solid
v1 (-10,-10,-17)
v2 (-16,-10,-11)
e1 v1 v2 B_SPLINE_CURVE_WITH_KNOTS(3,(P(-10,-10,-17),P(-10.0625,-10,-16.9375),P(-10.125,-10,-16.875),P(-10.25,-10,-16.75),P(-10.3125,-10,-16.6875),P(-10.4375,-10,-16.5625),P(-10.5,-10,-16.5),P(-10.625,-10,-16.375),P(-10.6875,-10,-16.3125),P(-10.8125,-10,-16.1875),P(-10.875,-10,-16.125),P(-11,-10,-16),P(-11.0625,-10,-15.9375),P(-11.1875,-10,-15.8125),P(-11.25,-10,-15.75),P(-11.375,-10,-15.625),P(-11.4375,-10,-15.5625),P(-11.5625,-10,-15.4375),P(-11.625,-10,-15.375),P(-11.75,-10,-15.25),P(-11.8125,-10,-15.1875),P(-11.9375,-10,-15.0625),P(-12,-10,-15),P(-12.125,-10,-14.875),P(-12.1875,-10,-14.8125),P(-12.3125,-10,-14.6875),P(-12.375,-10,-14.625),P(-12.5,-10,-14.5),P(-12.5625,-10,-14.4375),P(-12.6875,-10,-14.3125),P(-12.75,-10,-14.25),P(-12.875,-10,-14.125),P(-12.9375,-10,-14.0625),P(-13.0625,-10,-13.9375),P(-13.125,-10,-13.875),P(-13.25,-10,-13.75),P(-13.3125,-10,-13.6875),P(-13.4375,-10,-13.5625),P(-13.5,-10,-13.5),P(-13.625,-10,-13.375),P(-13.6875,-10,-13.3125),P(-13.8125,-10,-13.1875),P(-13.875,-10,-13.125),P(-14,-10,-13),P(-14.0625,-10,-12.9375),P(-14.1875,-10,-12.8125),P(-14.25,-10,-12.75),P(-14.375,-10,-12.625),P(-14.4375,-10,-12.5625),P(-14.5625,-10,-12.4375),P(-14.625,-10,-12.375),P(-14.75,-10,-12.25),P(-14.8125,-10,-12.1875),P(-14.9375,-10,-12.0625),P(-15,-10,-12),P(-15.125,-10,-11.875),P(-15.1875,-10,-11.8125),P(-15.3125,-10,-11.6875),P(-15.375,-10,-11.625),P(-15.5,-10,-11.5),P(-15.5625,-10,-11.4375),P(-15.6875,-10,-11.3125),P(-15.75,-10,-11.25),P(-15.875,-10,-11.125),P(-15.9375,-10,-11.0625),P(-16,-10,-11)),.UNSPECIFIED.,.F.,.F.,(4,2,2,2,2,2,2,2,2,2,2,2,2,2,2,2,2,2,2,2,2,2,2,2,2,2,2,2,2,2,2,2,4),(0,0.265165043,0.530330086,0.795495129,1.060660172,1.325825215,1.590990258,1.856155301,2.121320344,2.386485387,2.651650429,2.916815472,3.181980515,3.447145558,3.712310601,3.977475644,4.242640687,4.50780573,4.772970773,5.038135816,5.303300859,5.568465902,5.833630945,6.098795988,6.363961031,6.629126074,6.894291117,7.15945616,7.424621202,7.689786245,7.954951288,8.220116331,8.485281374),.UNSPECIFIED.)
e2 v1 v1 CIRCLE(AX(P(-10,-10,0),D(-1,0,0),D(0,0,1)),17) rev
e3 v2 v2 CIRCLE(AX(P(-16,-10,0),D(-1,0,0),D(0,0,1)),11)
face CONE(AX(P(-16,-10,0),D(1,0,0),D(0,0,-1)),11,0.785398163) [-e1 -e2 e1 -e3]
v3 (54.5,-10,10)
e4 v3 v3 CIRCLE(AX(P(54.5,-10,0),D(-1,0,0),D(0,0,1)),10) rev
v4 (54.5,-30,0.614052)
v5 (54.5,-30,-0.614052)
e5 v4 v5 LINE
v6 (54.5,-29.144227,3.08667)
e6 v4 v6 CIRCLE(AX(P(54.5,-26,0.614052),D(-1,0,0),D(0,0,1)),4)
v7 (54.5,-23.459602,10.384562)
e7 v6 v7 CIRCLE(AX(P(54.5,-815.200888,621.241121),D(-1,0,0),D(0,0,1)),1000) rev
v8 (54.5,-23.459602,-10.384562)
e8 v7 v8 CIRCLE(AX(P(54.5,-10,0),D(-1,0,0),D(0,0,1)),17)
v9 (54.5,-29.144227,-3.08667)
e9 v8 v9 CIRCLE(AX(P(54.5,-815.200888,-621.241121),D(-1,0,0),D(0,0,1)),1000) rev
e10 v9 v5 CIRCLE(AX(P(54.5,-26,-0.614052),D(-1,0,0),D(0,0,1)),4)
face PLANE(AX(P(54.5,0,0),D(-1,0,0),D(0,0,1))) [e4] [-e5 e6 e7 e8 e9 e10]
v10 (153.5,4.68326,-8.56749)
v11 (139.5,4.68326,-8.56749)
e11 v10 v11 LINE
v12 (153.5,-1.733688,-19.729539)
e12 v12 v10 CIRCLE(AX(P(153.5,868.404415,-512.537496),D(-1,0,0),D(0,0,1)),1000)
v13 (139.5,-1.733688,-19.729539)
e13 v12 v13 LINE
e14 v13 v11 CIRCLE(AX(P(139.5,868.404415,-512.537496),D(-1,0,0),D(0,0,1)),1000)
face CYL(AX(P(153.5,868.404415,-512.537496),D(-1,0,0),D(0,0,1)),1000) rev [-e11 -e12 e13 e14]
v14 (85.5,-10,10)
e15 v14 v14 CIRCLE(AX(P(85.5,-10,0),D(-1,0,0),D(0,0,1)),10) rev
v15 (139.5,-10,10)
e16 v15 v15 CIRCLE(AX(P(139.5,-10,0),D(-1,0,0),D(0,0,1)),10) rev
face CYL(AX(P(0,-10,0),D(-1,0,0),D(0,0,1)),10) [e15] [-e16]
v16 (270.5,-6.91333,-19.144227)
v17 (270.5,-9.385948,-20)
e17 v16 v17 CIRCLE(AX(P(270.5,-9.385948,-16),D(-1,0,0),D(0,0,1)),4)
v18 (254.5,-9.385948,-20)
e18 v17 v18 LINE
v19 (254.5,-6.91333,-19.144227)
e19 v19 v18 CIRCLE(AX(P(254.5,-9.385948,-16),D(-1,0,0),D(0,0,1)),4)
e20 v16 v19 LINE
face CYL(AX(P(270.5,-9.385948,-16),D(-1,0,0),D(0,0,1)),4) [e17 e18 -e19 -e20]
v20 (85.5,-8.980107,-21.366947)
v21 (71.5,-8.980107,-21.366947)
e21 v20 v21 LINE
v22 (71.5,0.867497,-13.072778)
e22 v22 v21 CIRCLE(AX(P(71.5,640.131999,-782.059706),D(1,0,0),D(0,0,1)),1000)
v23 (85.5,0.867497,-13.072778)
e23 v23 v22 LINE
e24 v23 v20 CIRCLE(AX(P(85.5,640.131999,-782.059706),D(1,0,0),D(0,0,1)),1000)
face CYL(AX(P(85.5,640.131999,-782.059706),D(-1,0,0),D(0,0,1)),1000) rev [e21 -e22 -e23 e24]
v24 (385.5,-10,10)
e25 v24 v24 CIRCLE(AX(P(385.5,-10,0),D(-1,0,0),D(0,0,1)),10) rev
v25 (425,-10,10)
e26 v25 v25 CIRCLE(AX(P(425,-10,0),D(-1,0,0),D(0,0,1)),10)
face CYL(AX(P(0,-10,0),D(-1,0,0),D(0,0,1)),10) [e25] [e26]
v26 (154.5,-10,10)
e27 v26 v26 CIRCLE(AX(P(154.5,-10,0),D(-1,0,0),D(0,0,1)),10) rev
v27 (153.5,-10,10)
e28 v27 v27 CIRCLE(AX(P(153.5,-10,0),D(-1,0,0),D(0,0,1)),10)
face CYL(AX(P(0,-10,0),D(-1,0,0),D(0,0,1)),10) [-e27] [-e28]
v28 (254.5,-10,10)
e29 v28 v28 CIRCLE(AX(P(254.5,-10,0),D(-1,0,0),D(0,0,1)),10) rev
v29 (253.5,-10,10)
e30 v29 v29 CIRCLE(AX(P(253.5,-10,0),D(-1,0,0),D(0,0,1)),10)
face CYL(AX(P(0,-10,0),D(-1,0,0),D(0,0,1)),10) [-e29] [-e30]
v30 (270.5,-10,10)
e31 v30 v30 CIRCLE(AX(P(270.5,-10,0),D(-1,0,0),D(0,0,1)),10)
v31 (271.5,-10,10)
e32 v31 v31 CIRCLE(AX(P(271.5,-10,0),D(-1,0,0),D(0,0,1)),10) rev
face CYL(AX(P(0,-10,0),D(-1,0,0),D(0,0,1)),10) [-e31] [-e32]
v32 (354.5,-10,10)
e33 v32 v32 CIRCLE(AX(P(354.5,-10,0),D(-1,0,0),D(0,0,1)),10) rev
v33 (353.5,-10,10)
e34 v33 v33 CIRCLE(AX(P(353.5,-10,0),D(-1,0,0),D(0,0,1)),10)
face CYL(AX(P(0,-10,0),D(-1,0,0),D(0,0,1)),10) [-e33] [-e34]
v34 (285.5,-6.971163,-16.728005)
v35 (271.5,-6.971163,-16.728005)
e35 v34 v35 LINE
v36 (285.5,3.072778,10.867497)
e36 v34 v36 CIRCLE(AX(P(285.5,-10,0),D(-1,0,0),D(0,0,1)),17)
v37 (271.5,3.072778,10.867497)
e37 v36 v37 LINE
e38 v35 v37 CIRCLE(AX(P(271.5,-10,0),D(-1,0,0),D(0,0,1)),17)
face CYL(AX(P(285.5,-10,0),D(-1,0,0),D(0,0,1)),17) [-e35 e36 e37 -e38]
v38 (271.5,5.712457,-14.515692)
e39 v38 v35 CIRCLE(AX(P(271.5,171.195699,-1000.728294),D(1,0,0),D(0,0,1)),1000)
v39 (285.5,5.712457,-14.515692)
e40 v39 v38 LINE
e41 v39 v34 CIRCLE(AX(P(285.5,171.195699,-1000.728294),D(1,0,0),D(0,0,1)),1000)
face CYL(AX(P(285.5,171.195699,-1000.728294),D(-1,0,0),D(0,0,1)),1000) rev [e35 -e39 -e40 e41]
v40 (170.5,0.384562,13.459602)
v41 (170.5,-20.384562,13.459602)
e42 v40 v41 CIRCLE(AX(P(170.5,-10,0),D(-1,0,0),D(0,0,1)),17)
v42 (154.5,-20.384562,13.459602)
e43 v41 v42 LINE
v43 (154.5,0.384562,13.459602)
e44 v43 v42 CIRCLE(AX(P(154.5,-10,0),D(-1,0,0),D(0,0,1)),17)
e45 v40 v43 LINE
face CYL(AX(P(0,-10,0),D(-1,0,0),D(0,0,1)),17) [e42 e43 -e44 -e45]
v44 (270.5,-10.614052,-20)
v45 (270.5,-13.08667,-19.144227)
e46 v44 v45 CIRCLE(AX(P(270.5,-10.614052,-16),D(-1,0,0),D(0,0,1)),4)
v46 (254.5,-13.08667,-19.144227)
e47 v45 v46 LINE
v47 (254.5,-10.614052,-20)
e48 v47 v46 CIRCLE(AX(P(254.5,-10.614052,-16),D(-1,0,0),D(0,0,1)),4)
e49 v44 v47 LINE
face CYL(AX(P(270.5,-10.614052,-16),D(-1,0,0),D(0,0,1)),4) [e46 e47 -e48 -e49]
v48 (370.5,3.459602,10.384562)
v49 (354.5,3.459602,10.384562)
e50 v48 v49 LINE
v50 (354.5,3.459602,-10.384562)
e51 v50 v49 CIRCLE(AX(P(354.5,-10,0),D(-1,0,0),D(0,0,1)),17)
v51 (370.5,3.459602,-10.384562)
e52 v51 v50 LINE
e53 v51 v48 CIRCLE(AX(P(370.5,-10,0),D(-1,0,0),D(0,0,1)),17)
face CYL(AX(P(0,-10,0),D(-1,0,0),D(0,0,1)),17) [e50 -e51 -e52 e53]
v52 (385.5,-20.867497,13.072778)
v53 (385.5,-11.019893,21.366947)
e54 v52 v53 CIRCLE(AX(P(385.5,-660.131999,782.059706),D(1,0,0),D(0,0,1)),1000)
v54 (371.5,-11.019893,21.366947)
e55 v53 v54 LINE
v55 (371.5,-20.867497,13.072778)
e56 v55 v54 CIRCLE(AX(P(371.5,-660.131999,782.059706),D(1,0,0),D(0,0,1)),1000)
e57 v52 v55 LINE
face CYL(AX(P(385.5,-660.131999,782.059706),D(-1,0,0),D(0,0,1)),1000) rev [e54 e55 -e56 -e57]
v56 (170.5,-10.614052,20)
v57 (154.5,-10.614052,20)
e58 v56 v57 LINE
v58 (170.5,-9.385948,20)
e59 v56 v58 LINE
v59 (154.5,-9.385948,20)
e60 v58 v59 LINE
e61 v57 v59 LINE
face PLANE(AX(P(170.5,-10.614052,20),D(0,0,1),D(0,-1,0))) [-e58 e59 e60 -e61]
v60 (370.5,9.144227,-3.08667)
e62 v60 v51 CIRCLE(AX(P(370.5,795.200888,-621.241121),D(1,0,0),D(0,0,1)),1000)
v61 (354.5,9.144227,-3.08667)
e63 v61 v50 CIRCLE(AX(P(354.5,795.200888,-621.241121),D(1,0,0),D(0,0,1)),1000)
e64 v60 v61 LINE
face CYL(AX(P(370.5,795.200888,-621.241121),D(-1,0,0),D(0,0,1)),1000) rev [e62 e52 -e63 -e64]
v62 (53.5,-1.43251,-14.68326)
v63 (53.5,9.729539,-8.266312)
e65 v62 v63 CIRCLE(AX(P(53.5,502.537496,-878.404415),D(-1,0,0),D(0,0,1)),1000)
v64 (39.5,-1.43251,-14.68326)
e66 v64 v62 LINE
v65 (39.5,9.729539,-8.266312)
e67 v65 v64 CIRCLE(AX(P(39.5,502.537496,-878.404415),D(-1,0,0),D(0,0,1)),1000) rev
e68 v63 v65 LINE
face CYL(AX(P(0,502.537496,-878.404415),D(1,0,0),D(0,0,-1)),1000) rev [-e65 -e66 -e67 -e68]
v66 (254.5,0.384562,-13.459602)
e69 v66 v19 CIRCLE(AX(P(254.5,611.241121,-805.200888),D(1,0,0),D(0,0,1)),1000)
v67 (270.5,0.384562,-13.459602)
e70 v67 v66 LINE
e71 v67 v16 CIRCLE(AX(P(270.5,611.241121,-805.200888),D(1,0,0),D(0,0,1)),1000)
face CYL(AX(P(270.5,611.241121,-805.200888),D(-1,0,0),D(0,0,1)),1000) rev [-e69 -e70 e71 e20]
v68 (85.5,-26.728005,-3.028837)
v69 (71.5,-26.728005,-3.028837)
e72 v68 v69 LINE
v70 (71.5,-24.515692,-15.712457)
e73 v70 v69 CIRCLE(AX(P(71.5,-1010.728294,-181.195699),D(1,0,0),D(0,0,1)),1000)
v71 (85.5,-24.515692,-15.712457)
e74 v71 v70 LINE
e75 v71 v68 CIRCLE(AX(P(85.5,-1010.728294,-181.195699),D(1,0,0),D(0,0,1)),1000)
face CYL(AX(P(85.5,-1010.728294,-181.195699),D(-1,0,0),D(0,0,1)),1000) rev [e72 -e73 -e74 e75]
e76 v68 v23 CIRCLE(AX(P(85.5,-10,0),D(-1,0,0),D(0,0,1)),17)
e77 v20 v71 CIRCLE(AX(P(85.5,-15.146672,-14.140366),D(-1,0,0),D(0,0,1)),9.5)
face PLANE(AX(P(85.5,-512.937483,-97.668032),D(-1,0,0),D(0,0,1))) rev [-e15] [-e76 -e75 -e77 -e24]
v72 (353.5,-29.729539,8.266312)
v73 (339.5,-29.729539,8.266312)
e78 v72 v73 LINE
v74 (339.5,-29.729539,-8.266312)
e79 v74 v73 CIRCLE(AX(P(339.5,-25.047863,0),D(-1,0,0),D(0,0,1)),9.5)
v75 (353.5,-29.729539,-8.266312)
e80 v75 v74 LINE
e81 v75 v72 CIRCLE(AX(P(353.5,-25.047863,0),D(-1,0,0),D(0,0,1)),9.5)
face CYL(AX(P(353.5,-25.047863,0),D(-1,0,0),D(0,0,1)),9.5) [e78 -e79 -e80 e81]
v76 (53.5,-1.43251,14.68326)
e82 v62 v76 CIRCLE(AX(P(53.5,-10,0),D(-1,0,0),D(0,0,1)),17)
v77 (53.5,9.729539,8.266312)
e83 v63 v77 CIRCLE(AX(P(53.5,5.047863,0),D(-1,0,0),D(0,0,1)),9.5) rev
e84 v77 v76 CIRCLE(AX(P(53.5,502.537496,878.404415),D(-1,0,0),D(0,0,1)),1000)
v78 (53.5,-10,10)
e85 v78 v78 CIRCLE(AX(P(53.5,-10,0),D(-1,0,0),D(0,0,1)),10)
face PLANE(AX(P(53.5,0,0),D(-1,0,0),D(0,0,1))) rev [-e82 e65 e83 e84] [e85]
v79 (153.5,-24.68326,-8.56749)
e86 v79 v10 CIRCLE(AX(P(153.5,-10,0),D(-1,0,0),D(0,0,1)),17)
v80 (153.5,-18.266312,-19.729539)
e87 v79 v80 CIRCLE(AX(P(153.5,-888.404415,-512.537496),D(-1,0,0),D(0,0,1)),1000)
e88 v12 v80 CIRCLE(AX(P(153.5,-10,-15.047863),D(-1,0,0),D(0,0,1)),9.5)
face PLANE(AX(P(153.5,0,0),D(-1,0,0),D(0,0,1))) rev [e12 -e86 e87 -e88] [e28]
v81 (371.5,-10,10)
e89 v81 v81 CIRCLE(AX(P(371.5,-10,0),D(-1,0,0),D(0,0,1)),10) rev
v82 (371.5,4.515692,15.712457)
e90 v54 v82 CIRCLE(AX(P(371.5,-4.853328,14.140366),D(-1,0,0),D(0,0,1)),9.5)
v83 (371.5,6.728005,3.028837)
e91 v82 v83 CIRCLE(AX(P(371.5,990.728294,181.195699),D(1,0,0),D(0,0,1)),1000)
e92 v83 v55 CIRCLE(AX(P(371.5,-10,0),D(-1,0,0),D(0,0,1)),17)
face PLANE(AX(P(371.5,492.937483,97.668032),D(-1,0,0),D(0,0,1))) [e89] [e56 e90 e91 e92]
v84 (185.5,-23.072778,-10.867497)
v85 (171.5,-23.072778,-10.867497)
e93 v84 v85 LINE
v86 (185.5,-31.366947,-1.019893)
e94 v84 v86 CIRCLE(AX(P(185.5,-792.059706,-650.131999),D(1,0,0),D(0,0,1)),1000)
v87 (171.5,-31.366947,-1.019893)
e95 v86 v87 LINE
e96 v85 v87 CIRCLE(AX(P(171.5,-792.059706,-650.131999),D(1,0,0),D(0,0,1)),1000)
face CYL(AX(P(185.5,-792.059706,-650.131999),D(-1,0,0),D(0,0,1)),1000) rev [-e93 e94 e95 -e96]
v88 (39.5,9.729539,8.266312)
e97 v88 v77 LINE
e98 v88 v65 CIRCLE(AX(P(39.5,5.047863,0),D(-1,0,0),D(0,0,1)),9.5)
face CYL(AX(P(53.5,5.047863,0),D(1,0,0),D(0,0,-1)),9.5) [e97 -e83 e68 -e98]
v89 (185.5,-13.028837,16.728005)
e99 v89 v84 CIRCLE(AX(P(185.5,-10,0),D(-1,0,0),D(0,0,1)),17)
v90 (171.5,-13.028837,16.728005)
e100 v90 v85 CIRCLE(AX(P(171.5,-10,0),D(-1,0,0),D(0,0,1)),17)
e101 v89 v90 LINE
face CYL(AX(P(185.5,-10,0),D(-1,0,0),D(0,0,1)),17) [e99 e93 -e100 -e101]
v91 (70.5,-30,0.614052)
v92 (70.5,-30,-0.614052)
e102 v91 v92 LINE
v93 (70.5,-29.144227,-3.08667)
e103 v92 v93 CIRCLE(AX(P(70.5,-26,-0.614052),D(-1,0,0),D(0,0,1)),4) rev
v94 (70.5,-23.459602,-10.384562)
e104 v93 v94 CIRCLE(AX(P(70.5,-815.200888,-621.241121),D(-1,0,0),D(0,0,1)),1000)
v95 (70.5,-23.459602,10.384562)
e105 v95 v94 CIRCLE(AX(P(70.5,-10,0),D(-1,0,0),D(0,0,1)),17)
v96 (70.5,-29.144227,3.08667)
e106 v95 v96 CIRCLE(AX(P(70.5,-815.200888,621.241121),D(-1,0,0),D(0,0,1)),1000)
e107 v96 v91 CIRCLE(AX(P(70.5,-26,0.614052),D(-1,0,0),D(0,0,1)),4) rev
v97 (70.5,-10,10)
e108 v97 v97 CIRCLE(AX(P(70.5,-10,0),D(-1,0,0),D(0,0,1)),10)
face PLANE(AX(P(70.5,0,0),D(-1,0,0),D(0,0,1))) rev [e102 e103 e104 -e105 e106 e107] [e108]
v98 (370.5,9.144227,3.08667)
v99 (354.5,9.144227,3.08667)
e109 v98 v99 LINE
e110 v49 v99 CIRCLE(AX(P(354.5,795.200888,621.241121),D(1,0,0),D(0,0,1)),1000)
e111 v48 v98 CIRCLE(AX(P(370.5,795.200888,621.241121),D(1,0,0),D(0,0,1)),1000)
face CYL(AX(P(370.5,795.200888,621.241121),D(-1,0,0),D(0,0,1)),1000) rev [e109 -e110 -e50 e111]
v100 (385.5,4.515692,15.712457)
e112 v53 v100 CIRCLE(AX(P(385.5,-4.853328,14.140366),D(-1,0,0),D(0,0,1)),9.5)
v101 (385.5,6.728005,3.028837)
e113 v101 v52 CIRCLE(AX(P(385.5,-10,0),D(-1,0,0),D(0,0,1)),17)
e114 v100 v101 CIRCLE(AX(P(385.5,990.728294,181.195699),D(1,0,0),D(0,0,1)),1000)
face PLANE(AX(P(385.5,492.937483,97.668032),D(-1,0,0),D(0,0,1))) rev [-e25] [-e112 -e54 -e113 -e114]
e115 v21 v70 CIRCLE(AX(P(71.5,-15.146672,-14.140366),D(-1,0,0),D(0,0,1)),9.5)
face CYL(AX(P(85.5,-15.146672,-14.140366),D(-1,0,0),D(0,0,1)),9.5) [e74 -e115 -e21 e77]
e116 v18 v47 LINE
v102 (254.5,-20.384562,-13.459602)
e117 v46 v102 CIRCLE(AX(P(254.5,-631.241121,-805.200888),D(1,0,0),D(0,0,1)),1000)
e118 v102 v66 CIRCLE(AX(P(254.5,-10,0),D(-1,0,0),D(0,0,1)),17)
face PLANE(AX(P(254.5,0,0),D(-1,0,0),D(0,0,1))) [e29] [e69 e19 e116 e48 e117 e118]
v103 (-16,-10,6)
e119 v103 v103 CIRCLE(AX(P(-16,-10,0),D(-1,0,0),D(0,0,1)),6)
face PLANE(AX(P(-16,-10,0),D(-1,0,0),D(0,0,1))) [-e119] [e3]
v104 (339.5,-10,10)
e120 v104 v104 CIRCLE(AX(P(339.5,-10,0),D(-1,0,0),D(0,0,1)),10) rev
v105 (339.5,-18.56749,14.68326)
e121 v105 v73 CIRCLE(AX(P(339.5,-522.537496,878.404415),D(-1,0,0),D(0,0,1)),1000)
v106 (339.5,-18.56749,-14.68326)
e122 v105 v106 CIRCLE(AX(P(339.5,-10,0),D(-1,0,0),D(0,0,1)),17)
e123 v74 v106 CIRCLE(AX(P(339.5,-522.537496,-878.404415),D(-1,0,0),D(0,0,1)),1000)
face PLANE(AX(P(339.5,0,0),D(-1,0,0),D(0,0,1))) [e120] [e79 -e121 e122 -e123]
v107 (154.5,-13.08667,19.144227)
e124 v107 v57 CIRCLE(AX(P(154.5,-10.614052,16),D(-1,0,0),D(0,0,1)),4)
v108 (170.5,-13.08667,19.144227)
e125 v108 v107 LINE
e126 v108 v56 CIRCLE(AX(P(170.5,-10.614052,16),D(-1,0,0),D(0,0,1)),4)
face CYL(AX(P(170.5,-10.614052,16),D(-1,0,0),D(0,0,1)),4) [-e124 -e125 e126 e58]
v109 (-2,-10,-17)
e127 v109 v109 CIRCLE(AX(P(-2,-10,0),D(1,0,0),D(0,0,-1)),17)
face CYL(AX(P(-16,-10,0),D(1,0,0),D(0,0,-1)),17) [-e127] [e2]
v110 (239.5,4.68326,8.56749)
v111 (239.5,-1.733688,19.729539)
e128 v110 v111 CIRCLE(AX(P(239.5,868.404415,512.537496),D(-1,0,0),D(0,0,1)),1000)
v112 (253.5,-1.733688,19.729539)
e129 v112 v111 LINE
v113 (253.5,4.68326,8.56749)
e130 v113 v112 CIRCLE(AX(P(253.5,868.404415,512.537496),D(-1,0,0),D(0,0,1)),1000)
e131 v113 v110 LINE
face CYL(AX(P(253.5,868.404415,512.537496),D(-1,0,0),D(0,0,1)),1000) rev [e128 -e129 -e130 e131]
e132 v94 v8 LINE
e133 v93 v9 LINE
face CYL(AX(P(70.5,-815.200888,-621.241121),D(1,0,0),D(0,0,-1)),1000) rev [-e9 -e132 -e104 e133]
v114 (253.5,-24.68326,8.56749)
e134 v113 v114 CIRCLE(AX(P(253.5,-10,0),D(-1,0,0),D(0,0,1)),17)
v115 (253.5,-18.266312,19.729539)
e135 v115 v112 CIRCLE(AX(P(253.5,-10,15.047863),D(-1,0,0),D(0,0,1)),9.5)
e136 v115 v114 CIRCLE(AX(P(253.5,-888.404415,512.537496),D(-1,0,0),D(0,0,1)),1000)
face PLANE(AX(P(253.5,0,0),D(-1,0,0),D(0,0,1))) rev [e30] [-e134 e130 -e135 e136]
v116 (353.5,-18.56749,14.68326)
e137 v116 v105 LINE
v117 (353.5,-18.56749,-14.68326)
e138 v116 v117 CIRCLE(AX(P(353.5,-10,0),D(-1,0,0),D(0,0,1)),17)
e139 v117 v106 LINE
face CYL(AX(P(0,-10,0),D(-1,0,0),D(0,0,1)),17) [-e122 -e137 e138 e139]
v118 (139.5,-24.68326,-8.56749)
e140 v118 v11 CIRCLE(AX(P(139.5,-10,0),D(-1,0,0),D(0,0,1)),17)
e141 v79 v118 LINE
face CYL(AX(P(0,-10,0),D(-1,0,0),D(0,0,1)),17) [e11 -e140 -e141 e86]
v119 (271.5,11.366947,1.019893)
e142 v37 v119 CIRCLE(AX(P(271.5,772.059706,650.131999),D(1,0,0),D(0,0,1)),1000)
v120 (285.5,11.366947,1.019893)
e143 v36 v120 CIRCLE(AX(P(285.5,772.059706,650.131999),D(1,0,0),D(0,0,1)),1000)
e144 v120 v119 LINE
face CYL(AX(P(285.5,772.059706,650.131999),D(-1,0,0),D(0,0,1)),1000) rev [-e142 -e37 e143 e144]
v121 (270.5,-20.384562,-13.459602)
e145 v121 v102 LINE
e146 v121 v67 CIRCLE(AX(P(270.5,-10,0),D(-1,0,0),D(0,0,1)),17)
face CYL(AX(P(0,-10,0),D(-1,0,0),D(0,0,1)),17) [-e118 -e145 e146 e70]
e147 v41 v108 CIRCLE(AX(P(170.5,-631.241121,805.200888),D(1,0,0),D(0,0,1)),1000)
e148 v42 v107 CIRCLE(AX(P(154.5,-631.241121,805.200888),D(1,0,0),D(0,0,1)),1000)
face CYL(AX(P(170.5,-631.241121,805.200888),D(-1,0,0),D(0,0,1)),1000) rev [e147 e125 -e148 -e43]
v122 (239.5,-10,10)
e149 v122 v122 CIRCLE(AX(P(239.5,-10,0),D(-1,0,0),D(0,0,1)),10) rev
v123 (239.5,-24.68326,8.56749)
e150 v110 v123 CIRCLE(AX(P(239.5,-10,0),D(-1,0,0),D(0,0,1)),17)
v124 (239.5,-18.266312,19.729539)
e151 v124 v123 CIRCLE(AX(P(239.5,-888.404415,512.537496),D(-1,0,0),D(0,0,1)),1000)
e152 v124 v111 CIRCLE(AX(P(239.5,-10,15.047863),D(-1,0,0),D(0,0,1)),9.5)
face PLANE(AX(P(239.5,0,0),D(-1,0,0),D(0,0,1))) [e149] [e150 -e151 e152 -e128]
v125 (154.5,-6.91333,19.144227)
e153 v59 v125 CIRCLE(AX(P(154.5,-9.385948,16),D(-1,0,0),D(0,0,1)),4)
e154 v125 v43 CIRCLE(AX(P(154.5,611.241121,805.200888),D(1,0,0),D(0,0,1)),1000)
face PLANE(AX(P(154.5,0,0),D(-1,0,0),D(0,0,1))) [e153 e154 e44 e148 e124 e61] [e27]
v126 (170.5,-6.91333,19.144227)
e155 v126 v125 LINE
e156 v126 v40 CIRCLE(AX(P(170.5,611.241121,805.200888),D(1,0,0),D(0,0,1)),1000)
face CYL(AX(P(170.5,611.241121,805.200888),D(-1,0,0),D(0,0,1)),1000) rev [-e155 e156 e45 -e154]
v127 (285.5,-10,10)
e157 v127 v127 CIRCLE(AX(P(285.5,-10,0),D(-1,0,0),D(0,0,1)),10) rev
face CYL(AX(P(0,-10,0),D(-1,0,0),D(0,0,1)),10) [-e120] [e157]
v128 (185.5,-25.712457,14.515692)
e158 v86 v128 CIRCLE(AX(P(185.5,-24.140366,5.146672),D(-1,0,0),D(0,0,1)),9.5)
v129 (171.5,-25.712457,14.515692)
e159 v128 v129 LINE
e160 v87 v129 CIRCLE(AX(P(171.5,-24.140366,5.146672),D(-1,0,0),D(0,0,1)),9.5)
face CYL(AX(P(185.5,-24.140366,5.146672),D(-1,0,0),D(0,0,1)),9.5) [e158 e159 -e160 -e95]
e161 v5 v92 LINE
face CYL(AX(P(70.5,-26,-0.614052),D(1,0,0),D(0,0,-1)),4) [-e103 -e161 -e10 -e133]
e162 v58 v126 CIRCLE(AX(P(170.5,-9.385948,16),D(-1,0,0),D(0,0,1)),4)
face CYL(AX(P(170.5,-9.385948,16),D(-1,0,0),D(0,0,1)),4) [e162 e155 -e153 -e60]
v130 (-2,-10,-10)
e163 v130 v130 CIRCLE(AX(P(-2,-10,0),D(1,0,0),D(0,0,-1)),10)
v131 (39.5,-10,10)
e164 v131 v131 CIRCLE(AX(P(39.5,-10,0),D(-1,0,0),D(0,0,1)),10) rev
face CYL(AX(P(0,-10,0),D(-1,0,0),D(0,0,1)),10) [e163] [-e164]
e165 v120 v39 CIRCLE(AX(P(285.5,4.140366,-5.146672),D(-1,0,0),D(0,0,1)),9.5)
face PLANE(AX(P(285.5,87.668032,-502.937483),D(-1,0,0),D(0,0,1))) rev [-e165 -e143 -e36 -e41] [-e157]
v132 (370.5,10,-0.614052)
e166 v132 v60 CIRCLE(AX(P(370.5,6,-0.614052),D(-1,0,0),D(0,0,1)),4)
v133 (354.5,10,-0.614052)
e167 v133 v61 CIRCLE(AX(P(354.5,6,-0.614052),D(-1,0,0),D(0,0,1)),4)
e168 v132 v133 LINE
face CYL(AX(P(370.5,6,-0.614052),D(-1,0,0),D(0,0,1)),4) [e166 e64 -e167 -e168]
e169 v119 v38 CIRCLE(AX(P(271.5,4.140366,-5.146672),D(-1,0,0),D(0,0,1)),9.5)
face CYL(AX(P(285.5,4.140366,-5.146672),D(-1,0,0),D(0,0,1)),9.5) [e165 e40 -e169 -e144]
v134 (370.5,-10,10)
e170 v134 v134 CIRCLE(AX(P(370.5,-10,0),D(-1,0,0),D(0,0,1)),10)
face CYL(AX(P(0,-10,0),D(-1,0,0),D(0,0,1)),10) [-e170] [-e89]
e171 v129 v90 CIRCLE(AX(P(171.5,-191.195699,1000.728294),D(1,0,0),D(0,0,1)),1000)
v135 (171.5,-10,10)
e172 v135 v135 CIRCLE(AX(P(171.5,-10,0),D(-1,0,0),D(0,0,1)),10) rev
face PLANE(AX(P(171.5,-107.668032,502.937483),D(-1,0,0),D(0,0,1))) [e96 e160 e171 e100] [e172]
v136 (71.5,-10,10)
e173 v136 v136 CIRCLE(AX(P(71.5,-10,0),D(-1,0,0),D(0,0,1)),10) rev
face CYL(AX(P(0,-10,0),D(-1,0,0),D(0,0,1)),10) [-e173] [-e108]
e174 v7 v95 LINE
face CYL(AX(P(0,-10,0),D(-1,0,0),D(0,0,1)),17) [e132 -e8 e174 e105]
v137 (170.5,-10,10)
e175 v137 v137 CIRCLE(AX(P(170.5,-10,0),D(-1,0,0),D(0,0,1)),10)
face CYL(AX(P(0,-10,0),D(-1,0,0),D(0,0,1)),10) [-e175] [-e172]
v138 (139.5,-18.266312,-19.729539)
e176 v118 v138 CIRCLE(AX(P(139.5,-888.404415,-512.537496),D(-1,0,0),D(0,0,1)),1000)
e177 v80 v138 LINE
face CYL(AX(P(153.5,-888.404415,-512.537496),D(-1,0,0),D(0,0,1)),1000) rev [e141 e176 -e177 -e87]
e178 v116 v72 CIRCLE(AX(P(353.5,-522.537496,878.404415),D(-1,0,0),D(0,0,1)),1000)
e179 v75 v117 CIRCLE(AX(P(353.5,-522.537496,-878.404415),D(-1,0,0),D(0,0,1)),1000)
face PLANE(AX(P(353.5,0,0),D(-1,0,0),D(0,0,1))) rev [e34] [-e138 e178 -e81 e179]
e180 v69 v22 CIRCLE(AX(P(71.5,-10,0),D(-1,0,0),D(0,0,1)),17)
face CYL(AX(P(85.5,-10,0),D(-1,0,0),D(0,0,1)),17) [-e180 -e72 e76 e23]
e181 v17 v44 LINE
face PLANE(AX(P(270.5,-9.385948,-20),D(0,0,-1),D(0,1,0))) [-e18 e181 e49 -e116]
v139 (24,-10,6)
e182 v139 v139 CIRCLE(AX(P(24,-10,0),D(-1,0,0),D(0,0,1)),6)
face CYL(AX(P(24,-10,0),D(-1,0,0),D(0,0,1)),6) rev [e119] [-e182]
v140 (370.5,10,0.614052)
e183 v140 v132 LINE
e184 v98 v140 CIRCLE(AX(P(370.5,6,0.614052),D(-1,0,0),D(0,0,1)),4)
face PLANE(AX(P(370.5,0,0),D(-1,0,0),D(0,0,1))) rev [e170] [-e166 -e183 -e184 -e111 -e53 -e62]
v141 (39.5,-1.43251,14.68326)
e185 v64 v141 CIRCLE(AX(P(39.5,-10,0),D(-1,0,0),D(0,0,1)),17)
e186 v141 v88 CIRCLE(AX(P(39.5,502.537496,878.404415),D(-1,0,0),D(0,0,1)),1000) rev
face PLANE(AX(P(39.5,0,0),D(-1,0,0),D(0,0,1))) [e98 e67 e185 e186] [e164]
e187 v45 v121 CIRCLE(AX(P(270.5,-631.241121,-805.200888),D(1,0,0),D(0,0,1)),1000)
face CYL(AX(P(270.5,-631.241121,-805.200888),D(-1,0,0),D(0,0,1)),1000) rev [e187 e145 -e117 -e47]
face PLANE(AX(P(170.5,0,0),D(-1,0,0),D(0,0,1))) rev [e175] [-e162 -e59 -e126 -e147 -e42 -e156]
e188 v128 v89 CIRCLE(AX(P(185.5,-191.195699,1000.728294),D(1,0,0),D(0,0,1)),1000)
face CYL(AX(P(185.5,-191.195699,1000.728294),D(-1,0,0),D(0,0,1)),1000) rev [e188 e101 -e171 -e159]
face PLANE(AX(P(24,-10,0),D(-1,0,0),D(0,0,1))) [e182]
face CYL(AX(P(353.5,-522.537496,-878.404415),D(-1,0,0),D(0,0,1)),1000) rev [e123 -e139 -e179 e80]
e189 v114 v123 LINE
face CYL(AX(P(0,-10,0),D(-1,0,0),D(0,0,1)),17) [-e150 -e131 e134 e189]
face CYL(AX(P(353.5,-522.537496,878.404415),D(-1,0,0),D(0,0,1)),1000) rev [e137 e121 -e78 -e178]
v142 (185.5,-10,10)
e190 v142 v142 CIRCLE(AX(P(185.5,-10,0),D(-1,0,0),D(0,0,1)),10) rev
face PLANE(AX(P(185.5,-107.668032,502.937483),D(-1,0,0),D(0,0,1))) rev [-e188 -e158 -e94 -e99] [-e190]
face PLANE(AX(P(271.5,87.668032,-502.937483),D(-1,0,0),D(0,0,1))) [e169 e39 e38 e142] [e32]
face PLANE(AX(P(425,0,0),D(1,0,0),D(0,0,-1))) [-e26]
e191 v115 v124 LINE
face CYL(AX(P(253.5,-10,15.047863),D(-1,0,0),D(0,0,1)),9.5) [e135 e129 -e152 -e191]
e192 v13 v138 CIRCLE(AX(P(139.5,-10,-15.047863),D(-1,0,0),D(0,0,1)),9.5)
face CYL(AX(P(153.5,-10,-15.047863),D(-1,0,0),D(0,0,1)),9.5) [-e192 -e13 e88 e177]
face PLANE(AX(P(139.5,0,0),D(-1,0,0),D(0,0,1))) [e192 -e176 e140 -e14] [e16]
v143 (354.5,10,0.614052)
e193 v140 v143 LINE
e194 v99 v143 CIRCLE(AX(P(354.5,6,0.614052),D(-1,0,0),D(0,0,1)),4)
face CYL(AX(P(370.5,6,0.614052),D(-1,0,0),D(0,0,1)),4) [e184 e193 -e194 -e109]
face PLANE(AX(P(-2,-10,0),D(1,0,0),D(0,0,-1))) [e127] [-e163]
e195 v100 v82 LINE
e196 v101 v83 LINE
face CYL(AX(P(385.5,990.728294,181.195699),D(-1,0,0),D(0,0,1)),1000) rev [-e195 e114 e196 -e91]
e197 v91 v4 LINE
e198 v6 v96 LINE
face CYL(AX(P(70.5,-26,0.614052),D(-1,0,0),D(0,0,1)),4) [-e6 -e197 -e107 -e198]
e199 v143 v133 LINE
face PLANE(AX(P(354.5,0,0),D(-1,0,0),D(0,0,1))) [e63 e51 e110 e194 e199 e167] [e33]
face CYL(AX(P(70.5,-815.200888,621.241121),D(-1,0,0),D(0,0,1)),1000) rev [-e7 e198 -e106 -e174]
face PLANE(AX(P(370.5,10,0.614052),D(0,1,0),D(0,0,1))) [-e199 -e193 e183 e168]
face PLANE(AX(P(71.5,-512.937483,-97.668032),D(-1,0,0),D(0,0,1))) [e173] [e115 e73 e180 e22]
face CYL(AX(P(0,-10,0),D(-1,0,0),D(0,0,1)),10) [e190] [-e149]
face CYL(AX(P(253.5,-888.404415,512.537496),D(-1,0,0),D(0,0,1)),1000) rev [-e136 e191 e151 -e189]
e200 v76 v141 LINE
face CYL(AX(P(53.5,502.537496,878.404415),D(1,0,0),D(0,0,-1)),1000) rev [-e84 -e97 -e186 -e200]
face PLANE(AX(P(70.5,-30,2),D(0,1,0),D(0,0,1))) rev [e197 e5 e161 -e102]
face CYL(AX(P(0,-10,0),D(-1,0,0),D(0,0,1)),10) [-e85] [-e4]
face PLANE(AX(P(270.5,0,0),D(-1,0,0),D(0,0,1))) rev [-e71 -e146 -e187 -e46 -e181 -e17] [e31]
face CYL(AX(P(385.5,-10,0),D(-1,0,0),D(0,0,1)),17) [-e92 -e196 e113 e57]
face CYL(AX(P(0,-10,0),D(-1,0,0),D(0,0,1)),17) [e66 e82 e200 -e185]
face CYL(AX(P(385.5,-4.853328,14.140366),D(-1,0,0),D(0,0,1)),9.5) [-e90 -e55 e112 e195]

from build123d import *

# Parameters (mm, degrees)
BOSS_EXTRUDE2_DEPTH  = 14
FILLET3_R            = 9.5
FILLET5_R            = 1000
BOSS_EXTRUDE5_DEPTH  = 14
BOSS_EXTRUDE6_DEPTH  = 14
BOSS_EXTRUDE7_DEPTH  = 14
BOSS_EXTRUDE8_DEPTH  = 14
BOSS_EXTRUDE9_DEPTH  = 14
BOSS_EXTRUDE10_DEPTH = 14
BOSS_EXTRUDE11_DEPTH = 14
SKETCH1_6_W          = 16
SKETCH1_6_H          = 7
BOSS_EXTRUDE12_DEPTH = 16
FILLET6_R            = 1000
FILLET7_R            = 4
BOSS_EXTRUDE13_DEPTH = 16
BOSS_EXTRUDE14_DEPTH = 16
BOSS_EXTRUDE15_DEPTH = 16
FRONT_START          = 16
SKETCH22_R           = 17
FRONT_DEPTH          = 16
CHAMFER1_SIZE        = 6
SKETCH23_R           = 6
CUT_EXTRUDE1_DEPTH   = 40
CUT_EXTRUDE2_START   = -2
SKETCH24_R           = 17
SKETCH24_R_2         = 10
CUT_EXTRUDE2_DEPTH   = 2
CUT_EXTRUDE4_DEPTH   = 14
BOSS_EXTRUDE16_DEPTH = 14
CUT_EXTRUDE5_DEPTH   = 14
BOSS_EXTRUDE17_DEPTH = 14
CUT_EXTRUDE6_DEPTH   = 14
BOSS_EXTRUDE18_DEPTH = 14
CUT_EXTRUDE7_DEPTH   = 14
BOSS_EXTRUDE19_DEPTH = 14


# Some blends are built 0.0001 mm under size
with BuildPart() as part:
    # Sketch1 → Revolve1 (revolve)
    with BuildSketch(Plane.XY, mode=Mode.PRIVATE) as revolve1_sk:
        Polygon((10, 0), (0, 0), (0, -10), (425, -10), (425, 0), (415, 0), (385.5, 0), (378.5, 0), (371.5, 0), (370.5, 0), (354.5, 0), (353.5, 0), (346.5, 0), (339.5, 0), (285.5, 0), (278.5, 0), (271.5, 0), (270.5, 0), (254.5, 0), (253.5, 0), (246.5, 0), (239.5, 0), (185.5, 0), (178.5, 0), (171.5, 0), (170.5, 0), (154.5, 0), (153.5, 0), (146.5, 0), (139.5, 0), (85.5, 0), (78.5, 0), (71.5, 0), (70.5, 0), (54.5, 0), (53.5, 0), (46.5, 0), (39.5, 0), align=None)
    revolve(revolve1_sk.sketch.rotate(Axis((0, -10, 0), (1, 0, 0)), 90), axis=Axis((0, -10, 0), (1, 0, 0)))

    # Sketch1<5> → Revolve2 (revolve)
    with BuildSketch(Plane.XY, mode=Mode.PRIVATE) as revolve2_sk:
        Polygon((39.5, 7), (39.5, 0), (46.5, 0), (53.5, 0), (53.5, 7), align=None)
        Polygon((71.5, 7), (71.5, 0), (78.5, 0), (85.5, 0), (85.5, 7), align=None)
        Polygon((139.5, 7), (139.5, 0), (146.5, 0), (153.5, 0), (153.5, 7), align=None)
        Polygon((171.5, 7), (171.5, 0), (178.5, 0), (185.5, 0), (185.5, 7), align=None)
        Polygon((239.5, 7), (239.5, 0), (246.5, 0), (253.5, 0), (253.5, 7), align=None)
        Polygon((278.5, 0), (285.5, 0), (285.5, 7), (271.5, 7), (271.5, 0), align=None)
        Polygon((346.5, 0), (353.5, 0), (353.5, 7), (339.5, 7), (339.5, 0), align=None)
        Polygon((378.5, 0), (385.5, 0), (385.5, 7), (371.5, 7), (371.5, 0), align=None)
    revolve(revolve2_sk.sketch.rotate(Axis((0, -10, 0), (1, 0, 0)), 90), axis=Axis((0, -10, 0), (1, 0, 0)))

    # Sketch2 → Boss-Extrude2 (add)
    with BuildSketch(Plane.ZY.offset(-39.5)):
        with BuildLine():
            Line((0, 15), (0, 7))
            ThreePointArc((0, 7), (6.16158644, 5.844079416), (11.485254692, 2.533512064))
            Line((11.485254692, 2.533512064), (6, 15))
            Line((6, 15), (0, 15))
        make_face()
        with BuildLine():
            ThreePointArc((-11.485254692, 2.533512064), (-6.16158644, 5.844079416), (0, 7))
            Line((0, 7), (0, 15))
            Line((0, 15), (-6, 15))
            Line((-6, 15), (-11.485254692, 2.533512064))
        make_face()
    extrude(amount=-BOSS_EXTRUDE2_DEPTH)

    # Fillet3
    fillet3_edges = [part.edges().sort_by_distance(p)[0] for p in [
        (46.5, 15, 6),
    ]]
    fillet(fillet3_edges, radius=FILLET3_R)
    fillet3_2_edges = [part.edges().sort_by_distance(p)[0] for p in [
        (46.5, 15, -6),
    ]]
    fillet(fillet3_2_edges, radius=FILLET3_R - 0.0001)  # a hair under: the kernel refuses the full size

    # Fillet5
    fillet5_edges = [part.edges().sort_by_distance(p)[0] for p in [
        (46.5, 2.533512064, 11.485254692),
        (46.5, 2.533512064, -11.485254692),
    ]]
    fillet(fillet5_edges, radius=FILLET5_R)

    # Sketch10 → Boss-Extrude5 (add)
    with BuildSketch(Plane.ZY.offset(-71.5)):
        with BuildLine():
            ThreePointArc((-14.683259634, -1.432509905), (0, 7), (14.683259634, -1.432509905))
            ThreePointArc((14.683259634, -1.432509905), (11.456821538, 4.138186943), (8.266311974, 9.729538737))
            ThreePointArc((8.266311974, 9.729538737), (0, 14.547863146), (-8.266311974, 9.729538737))
            ThreePointArc((-8.266311974, 9.729538737), (-11.456821538, 4.138186943), (-14.683259634, -1.432509905))
        make_face()
    extrude(amount=-BOSS_EXTRUDE5_DEPTH)

    # Sketch11 → Boss-Extrude6 (add)
    with BuildSketch(Plane.ZY.offset(-239.5)):
        with BuildLine():
            ThreePointArc((8.567490095, 4.683259634), (14.741901703, -1.533812299), (17, -10))
            ThreePointArc((17, -10), (14.741901703, -18.466187701), (8.567490095, -24.683259634))
            ThreePointArc((8.567490095, -24.683259634), (14.138186943, -21.456821538), (19.729538737, -18.266311974))
            ThreePointArc((19.729538737, -18.266311974), (24.547863146, -10), (19.729538737, -1.733688026))
            ThreePointArc((19.729538737, -1.733688026), (14.138186943, 1.456821538), (8.567490095, 4.683259634))
        make_face()
    extrude(amount=-BOSS_EXTRUDE6_DEPTH)

    # Sketch12 → Boss-Extrude7 (add)
    with BuildSketch(Plane.ZY.offset(-271.5)):
        with BuildLine():
            ThreePointArc((19.729538737, -18.266311974), (24.547863146, -10), (19.729538737, -1.733688026))
            ThreePointArc((19.729538737, -1.733688026), (14.138186943, 1.456821538), (8.567490095, 4.683259634))
            ThreePointArc((8.567490095, 4.683259634), (-17, -10), (8.567490095, -24.683259634))
            ThreePointArc((8.567490095, -24.683259634), (14.138186943, -21.456821538), (19.729538737, -18.266311974))
        make_face()
    extrude(amount=-BOSS_EXTRUDE7_DEPTH)

    # Sketch14 → Boss-Extrude8 (add)
    with BuildSketch(Plane.ZY.offset(-371.5)):
        with BuildLine():
            ThreePointArc((-8.266311974, -29.729538737), (0, -34.547863146), (8.266311974, -29.729538737))
            ThreePointArc((8.266311974, -29.729538737), (11.456821538, -24.138186943), (14.683259634, -18.567490095))
            ThreePointArc((14.683259634, -18.567490095), (0, 7), (-14.683259634, -18.567490095))
            ThreePointArc((-14.683259634, -18.567490095), (-11.456821538, -24.138186943), (-8.266311974, -29.729538737))
        make_face()
    extrude(amount=-BOSS_EXTRUDE8_DEPTH)

    # Sketch13 → Boss-Extrude9 (add)
    with BuildSketch(Plane.ZY.offset(-339.5)):
        with BuildLine():
            ThreePointArc((-8.266311974, -29.729538737), (0, -34.547863146), (8.266311974, -29.729538737))
            ThreePointArc((8.266311974, -29.729538737), (11.456821538, -24.138186943), (14.683259634, -18.567490095))
            ThreePointArc((14.683259634, -18.567490095), (0, 7), (-14.683259634, -18.567490095))
            ThreePointArc((-14.683259634, -18.567490095), (-11.456821538, -24.138186943), (-8.266311974, -29.729538737))
        make_face()
    extrude(amount=-BOSS_EXTRUDE9_DEPTH)

    # Sketch15 → Boss-Extrude10 (add)
    with BuildSketch(Plane.ZY.offset(-139.5)):
        with BuildLine():
            ThreePointArc((-19.729538737, -1.733688026), (-24.547863146, -10), (-19.729538737, -18.266311974))
            ThreePointArc((-19.729538737, -18.266311974), (-14.138186943, -21.456821538), (-8.567490095, -24.683259634))
            ThreePointArc((-8.567490095, -24.683259634), (17, -10), (-8.567490095, 4.683259634))
            ThreePointArc((-8.567490095, 4.683259634), (-14.138186943, 1.456821538), (-19.729538737, -1.733688026))
        make_face()
    extrude(amount=-BOSS_EXTRUDE10_DEPTH)

    # Sketch16 → Boss-Extrude11 (add)
    with BuildSketch(Plane.ZY.offset(-171.5)):
        with BuildLine():
            ThreePointArc((-19.729538737, -1.733688026), (-24.547863146, -10), (-19.729538737, -18.266311974))
            ThreePointArc((-19.729538737, -18.266311974), (-14.138186943, -21.456821538), (-8.567490095, -24.683259634))
            ThreePointArc((-8.567490095, -24.683259634), (17, -10), (-8.567490095, 4.683259634))
            ThreePointArc((-8.567490095, 4.683259634), (-14.138186943, 1.456821538), (-19.729538737, -1.733688026))
        make_face()
    extrude(amount=-BOSS_EXTRUDE11_DEPTH)

    # Sketch1<6> → Revolve3 (revolve)
    with BuildSketch(Plane.XY, mode=Mode.PRIVATE) as revolve3_sk:
        with Locations((62.5, 3.5)):
            Rectangle(SKETCH1_6_W, SKETCH1_6_H)
        with Locations((162.5, 3.5)):
            Rectangle(SKETCH1_6_W, SKETCH1_6_H)
        with Locations((262.5, 3.5)):
            Rectangle(SKETCH1_6_W, SKETCH1_6_H)
        with Locations((362.5, 3.5)):
            Rectangle(SKETCH1_6_W, SKETCH1_6_H)
    revolve(revolve3_sk.sketch.rotate(Axis((0, -10, 0), (1, 0, 0)), 90), axis=Axis((0, -10, 0), (1, 0, 0)))

    # Sketch17 → Boss-Extrude12 (add)
    with BuildSketch(Plane.ZY.offset(-54.5)):
        Polygon((2, -30), (-2, -30), (-17, -10), (17, -10), align=None)
    extrude(amount=-BOSS_EXTRUDE12_DEPTH)

    # Fillet6
    # the kernel refuses this fillet: 1000 mm, written as the material it adds along each edge
    with BuildSketch(Plane(origin=(70.5, -26.32, -4.76), x_dir=(0, -0.8000000000000175, 0.5999999999999766), z_dir=(-1, 0, 0))) as fillet6_piece_1:
        with BuildLine():
            CenterArc((261.216037906, -966.513429337), FILLET6_R, 104.869364111, 0.609274669)
            ThreePointArc((-5.663055414, -2.783410323), (-2.701251625, -1.656761544), (0, 0))
            Line((0, 0), (4.6, 0))
        make_face()
    extrude(amount=16)
    with BuildSketch(Plane(origin=(70.5, -26.32, 4.76), x_dir=(0, -0.800000000000032, -0.5999999999999576), z_dir=(-1, 0, 0))) as fillet6_piece_2:
        with BuildLine():
            CenterArc((261.216037906, 966.513429337), FILLET6_R, 254.52136122, 0.609274669)
            ThreePointArc((-5.663055414, 2.783410323), (-2.701251625, 1.656761544), (0, 0))
            Line((0, 0), (4.6, 0))
        make_face()
    extrude(amount=16)

    # Fillet7
    fillet7_edges = [part.edges().sort_by_distance(p)[0] for p in [
        (62.5, -30, 2),
        (62.5, -30, -2),
    ]]
    fillet(fillet7_edges, radius=FILLET7_R)

    # Sketch21 → Boss-Extrude13 (add)
    with BuildSketch(Plane.ZY.offset(-354.5)):
        with BuildLine():
            Line((0.614051952, 10), (-0.614051952, 10))
            ThreePointArc((-0.614051952, 10), (-1.922312901, 9.780007049), (-3.086669756, 9.144226645))
            ThreePointArc((-3.086669756, 9.144226645), (-6.7290423, 6.293475446), (-10.384561507, 3.459601863))
            ThreePointArc((-10.384561507, 3.459601863), (0, -27), (10.384561507, 3.459601863))
            ThreePointArc((10.384561507, 3.459601863), (6.7290423, 6.293475446), (3.086669756, 9.144226645))
            ThreePointArc((3.086669756, 9.144226645), (1.922312901, 9.780007049), (0.614051952, 10))
        make_face()
    extrude(amount=-BOSS_EXTRUDE13_DEPTH)

    # Sketch20 → Boss-Extrude14 (add)
    with BuildSketch(Plane.ZY.offset(-254.5)):
        with BuildLine():
            Line((-20, -9.385948048), (-20, -10.614051952))
            ThreePointArc((-20, -10.614051952), (-19.780007049, -11.922312901), (-19.144226645, -13.086669756))
            ThreePointArc((-19.144226645, -13.086669756), (-16.293475446, -16.7290423), (-13.459601863, -20.384561507))
            ThreePointArc((-13.459601863, -20.384561507), (17, -10), (-13.459601863, 0.384561507))
            ThreePointArc((-13.459601863, 0.384561507), (-16.293475446, -3.2709577), (-19.144226645, -6.913330244))
            ThreePointArc((-19.144226645, -6.913330244), (-19.780007049, -8.077687099), (-20, -9.385948048))
        make_face()
    extrude(amount=-BOSS_EXTRUDE14_DEPTH)

    # Sketch19 → Boss-Extrude15 (add)
    with BuildSketch(Plane.ZY.offset(-154.5)):
        with BuildLine():
            Line((20, -10.614051952), (20, -9.385948048))
            ThreePointArc((20, -9.385948048), (19.780007049, -8.077687099), (19.144226645, -6.913330244))
            ThreePointArc((19.144226645, -6.913330244), (16.293475446, -3.2709577), (13.459601863, 0.384561507))
            ThreePointArc((13.459601863, 0.384561507), (-17, -10), (13.459601863, -20.384561507))
            ThreePointArc((13.459601863, -20.384561507), (16.293475446, -16.7290423), (19.144226645, -13.086669756))
            ThreePointArc((19.144226645, -13.086669756), (19.780007049, -11.922312901), (20, -10.614051952))
        make_face()
    extrude(amount=-BOSS_EXTRUDE15_DEPTH)

    # Sketch22 → Front (add)
    with BuildSketch(Plane.ZY.offset(FRONT_START)):
        with Locations((0, -10)):
            Circle(SKETCH22_R)
    extrude(amount=-FRONT_DEPTH)

    # Chamfer1
    chamfer1_edges = [part.edges().sort_by_distance(p)[0] for p in [
        (-16, -10, -17),
    ]]
    chamfer(chamfer1_edges, length=CHAMFER1_SIZE)

    # Sketch23 → Cut-Extrude1 (cut)
    with BuildSketch(Plane.ZY.offset(16)):
        with Locations((0, -10)):
            Circle(SKETCH23_R)
    extrude(amount=-CUT_EXTRUDE1_DEPTH, mode=Mode.SUBTRACT)

    # Sketch24 → Cut-Extrude2 (cut)
    with BuildSketch(Plane(origin=(0, 0, 0), x_dir=(0, 0, -1), z_dir=(1, 0, 0)).offset(CUT_EXTRUDE2_START)):
        with Locations((0, -10)):
            Circle(SKETCH24_R)
        with Locations(Location((0, -10, 0), (0, 0, 180))):
            Circle(SKETCH24_R_2, mode=Mode.SUBTRACT)
    extrude(amount=CUT_EXTRUDE2_DEPTH, mode=Mode.SUBTRACT)

    # Sketch28 → Cut-Extrude4 (cut)
    with BuildSketch(Plane.ZY.offset(-71.5)):
        with BuildLine():
            ThreePointArc((-14.683259634, -1.432509905), (0, -27), (14.683259634, -1.432509905))
            ThreePointArc((14.683259634, -1.432509905), (11.456821538, 4.138186943), (8.266311974, 9.729538737))
            ThreePointArc((8.266311974, 9.729538737), (0, 14.547863146), (-8.266311974, 9.729538737))
            ThreePointArc((-8.266311974, 9.729538737), (-11.456821538, 4.138186943), (-14.683259634, -1.432509905))
        make_face()
    extrude(amount=-CUT_EXTRUDE4_DEPTH, mode=Mode.SUBTRACT)


with BuildPart() as cut_extrude4_piece_1:
    # of the separate pieces the step leaves, piece 1, a body of its own (cut_extrude4_pieces)
    add(part.part.solids().sort_by_distance((85.5, -10, 10))[0])



with BuildPart() as cut_extrude4_piece_2:
    # of the separate pieces the step leaves, piece 2, a body of its own (cut_extrude4_pieces)
    add(part.part.solids().sort_by_distance((-10, -10, 17))[0])


with BuildPart() as cut_extrude4_piece_1_1:
    add(cut_extrude4_piece_1.part)

    add(cut_extrude4_piece_2.part)  # Boss-Extrude16 merges Cut-Extrude4 piece 2
    # Sketch26 → Boss-Extrude16 (add)
    with BuildSketch(Plane.ZY.offset(-71.5)):
        with BuildLine():
            ThreePointArc((-3.028836657, -26.728004917), (15.974774553, -4.185657563), (-13.072777786, 0.867496536))
            ThreePointArc((-13.072777786, 0.867496536), (-17.204013686, -4.069654068), (-21.366947169, -8.980107303))
            ThreePointArc((-21.366947169, -8.980107303), (-23.067445855, -18.395863672), (-15.712456757, -24.51569203))
            ThreePointArc((-15.712456757, -24.51569203), (-9.367086197, -25.601435381), (-3.028836657, -26.728004917))
        make_face()
    extrude(amount=-BOSS_EXTRUDE16_DEPTH)

    # Sketch29 → Cut-Extrude5 (cut)
    with BuildSketch(Plane.ZY.offset(-171.5)):
        with BuildLine():
            ThreePointArc((-8.567490095, -24.683259634), (17, -10), (-8.567490095, 4.683259634))
            ThreePointArc((-8.567490095, 4.683259634), (-14.138186943, 1.456821538), (-19.729538737, -1.733688026))
            ThreePointArc((-19.729538737, -1.733688026), (-24.547863146, -10), (-19.729538737, -18.266311974))
            ThreePointArc((-19.729538737, -18.266311974), (-14.138186943, -21.456821538), (-8.567490095, -24.683259634))
        make_face()
    extrude(amount=-CUT_EXTRUDE5_DEPTH, mode=Mode.SUBTRACT)


with BuildPart() as cut_extrude5_piece_1:
    # of the separate pieces the step leaves, piece 1, a body of its own (cut_extrude5_pieces)
    add(cut_extrude4_piece_1_1.part.solids().sort_by_distance((185.5, -10, 10))[0])



with BuildPart() as cut_extrude5_piece_2:
    # of the separate pieces the step leaves, piece 2, a body of its own (cut_extrude5_pieces)
    add(cut_extrude4_piece_1_1.part.solids().sort_by_distance((71.5, -8.980107303, -21.366947169))[0])


with BuildPart() as cut_extrude5_piece_1_1:
    add(cut_extrude5_piece_1.part)

    add(cut_extrude5_piece_2.part)  # Boss-Extrude17 merges Cut-Extrude5 piece 2
    # Sketch30 → Boss-Extrude17 (add)
    with BuildSketch(Plane.ZY.offset(-171.5)):
        with BuildLine():
            ThreePointArc((16.728004917, -13.028836657), (-5.814342437, 5.974774553), (-10.867496536, -23.072777786))
            ThreePointArc((-10.867496536, -23.072777786), (-5.930345932, -27.204013686), (-1.019892697, -31.366947169))
            ThreePointArc((-1.019892697, -31.366947169), (8.395863672, -33.067445855), (14.51569203, -25.712456757))
            ThreePointArc((14.51569203, -25.712456757), (15.601435381, -19.367086197), (16.728004917, -13.028836657))
        make_face()
    extrude(amount=-BOSS_EXTRUDE17_DEPTH)

    # Sketch31 → Cut-Extrude6 (cut)
    with BuildSketch(Plane.ZY.offset(-271.5)):
        with BuildLine():
            ThreePointArc((8.567490095, 4.683259634), (-17, -10), (8.567490095, -24.683259634))
            ThreePointArc((8.567490095, -24.683259634), (14.138186943, -21.456821538), (19.729538737, -18.266311974))
            ThreePointArc((19.729538737, -18.266311974), (24.547863146, -10), (19.729538737, -1.733688026))
            ThreePointArc((19.729538737, -1.733688026), (14.138186943, 1.456821538), (8.567490095, 4.683259634))
        make_face()
    extrude(amount=-CUT_EXTRUDE6_DEPTH, mode=Mode.SUBTRACT)


with BuildPart() as cut_extrude6_piece_1:
    # of the separate pieces the step leaves, piece 1, a body of its own (cut_extrude6_pieces)
    add(cut_extrude5_piece_1_1.part.solids().sort_by_distance((171.5, -13.028836657, 16.728004917))[0])



with BuildPart() as cut_extrude6_piece_2:
    # of the separate pieces the step leaves, piece 2, a body of its own (cut_extrude6_pieces)
    add(cut_extrude5_piece_1_1.part.solids().sort_by_distance((285.5, -10, 10))[0])


with BuildPart() as cut_extrude6_piece_1_1:
    add(cut_extrude6_piece_1.part)

    add(cut_extrude6_piece_2.part)  # Boss-Extrude18 merges Cut-Extrude6 piece 2
    # Sketch32 → Boss-Extrude18 (add)
    with BuildSketch(Plane.ZY.offset(-271.5)):
        with BuildLine():
            ThreePointArc((-16.728004917, -6.971163343), (5.814342437, -25.974774553), (10.867496536, 3.072777786))
            ThreePointArc((10.867496536, 3.072777786), (5.930345932, 7.204013686), (1.019892697, 11.366947169))
            ThreePointArc((1.019892697, 11.366947169), (-8.395863672, 13.067445855), (-14.51569203, 5.712456757))
            ThreePointArc((-14.51569203, 5.712456757), (-15.601435381, -0.632913803), (-16.728004917, -6.971163343))
        make_face()
    extrude(amount=-BOSS_EXTRUDE18_DEPTH)

    # Sketch33 → Cut-Extrude7 (cut)
    with BuildSketch(Plane.ZY.offset(-371.5)):
        with BuildLine():
            ThreePointArc((14.683259634, -18.567490095), (0, 7), (-14.683259634, -18.567490095))
            ThreePointArc((-14.683259634, -18.567490095), (-11.456821538, -24.138186943), (-8.266311974, -29.729538737))
            ThreePointArc((-8.266311974, -29.729538737), (0, -34.547863146), (8.266311974, -29.729538737))
            ThreePointArc((8.266311974, -29.729538737), (11.456821538, -24.138186943), (14.683259634, -18.567490095))
        make_face()
    extrude(amount=-CUT_EXTRUDE7_DEPTH, mode=Mode.SUBTRACT)


with BuildPart() as cut_extrude7_piece_1:
    # of the separate pieces the step leaves, piece 1, a body of its own (cut_extrude7_pieces)
    add(cut_extrude6_piece_1_1.part.solids().sort_by_distance((271.5, 11.366947169, 1.019892697))[0])



with BuildPart() as cut_extrude7_piece_2:
    # of the separate pieces the step leaves, piece 2, a body of its own (cut_extrude7_pieces)
    add(cut_extrude6_piece_1_1.part.solids().sort_by_distance((385.5, -10, 10))[0])


with BuildPart() as cut_extrude7_piece_1_1:
    add(cut_extrude7_piece_1.part)

    add(cut_extrude7_piece_2.part)  # Boss-Extrude19 merges Cut-Extrude7 piece 2
    # Sketch34 → Boss-Extrude19 (add)
    with BuildSketch(Plane.ZY.offset(-371.5)):
        with BuildLine():
            ThreePointArc((3.028836657, 6.728004917), (-15.974774553, -15.814342437), (13.072777786, -20.867496536))
            ThreePointArc((13.072777786, -20.867496536), (17.204013686, -15.930345932), (21.366947169, -11.019892697))
            ThreePointArc((21.366947169, -11.019892697), (23.067445855, -1.604136328), (15.712456757, 4.51569203))
            ThreePointArc((15.712456757, 4.51569203), (9.367086197, 5.601435381), (3.028836657, 6.728004917))
        make_face()
    extrude(amount=-BOSS_EXTRUDE19_DEPTH)


solid = cut_extrude7_piece_1_1.part
